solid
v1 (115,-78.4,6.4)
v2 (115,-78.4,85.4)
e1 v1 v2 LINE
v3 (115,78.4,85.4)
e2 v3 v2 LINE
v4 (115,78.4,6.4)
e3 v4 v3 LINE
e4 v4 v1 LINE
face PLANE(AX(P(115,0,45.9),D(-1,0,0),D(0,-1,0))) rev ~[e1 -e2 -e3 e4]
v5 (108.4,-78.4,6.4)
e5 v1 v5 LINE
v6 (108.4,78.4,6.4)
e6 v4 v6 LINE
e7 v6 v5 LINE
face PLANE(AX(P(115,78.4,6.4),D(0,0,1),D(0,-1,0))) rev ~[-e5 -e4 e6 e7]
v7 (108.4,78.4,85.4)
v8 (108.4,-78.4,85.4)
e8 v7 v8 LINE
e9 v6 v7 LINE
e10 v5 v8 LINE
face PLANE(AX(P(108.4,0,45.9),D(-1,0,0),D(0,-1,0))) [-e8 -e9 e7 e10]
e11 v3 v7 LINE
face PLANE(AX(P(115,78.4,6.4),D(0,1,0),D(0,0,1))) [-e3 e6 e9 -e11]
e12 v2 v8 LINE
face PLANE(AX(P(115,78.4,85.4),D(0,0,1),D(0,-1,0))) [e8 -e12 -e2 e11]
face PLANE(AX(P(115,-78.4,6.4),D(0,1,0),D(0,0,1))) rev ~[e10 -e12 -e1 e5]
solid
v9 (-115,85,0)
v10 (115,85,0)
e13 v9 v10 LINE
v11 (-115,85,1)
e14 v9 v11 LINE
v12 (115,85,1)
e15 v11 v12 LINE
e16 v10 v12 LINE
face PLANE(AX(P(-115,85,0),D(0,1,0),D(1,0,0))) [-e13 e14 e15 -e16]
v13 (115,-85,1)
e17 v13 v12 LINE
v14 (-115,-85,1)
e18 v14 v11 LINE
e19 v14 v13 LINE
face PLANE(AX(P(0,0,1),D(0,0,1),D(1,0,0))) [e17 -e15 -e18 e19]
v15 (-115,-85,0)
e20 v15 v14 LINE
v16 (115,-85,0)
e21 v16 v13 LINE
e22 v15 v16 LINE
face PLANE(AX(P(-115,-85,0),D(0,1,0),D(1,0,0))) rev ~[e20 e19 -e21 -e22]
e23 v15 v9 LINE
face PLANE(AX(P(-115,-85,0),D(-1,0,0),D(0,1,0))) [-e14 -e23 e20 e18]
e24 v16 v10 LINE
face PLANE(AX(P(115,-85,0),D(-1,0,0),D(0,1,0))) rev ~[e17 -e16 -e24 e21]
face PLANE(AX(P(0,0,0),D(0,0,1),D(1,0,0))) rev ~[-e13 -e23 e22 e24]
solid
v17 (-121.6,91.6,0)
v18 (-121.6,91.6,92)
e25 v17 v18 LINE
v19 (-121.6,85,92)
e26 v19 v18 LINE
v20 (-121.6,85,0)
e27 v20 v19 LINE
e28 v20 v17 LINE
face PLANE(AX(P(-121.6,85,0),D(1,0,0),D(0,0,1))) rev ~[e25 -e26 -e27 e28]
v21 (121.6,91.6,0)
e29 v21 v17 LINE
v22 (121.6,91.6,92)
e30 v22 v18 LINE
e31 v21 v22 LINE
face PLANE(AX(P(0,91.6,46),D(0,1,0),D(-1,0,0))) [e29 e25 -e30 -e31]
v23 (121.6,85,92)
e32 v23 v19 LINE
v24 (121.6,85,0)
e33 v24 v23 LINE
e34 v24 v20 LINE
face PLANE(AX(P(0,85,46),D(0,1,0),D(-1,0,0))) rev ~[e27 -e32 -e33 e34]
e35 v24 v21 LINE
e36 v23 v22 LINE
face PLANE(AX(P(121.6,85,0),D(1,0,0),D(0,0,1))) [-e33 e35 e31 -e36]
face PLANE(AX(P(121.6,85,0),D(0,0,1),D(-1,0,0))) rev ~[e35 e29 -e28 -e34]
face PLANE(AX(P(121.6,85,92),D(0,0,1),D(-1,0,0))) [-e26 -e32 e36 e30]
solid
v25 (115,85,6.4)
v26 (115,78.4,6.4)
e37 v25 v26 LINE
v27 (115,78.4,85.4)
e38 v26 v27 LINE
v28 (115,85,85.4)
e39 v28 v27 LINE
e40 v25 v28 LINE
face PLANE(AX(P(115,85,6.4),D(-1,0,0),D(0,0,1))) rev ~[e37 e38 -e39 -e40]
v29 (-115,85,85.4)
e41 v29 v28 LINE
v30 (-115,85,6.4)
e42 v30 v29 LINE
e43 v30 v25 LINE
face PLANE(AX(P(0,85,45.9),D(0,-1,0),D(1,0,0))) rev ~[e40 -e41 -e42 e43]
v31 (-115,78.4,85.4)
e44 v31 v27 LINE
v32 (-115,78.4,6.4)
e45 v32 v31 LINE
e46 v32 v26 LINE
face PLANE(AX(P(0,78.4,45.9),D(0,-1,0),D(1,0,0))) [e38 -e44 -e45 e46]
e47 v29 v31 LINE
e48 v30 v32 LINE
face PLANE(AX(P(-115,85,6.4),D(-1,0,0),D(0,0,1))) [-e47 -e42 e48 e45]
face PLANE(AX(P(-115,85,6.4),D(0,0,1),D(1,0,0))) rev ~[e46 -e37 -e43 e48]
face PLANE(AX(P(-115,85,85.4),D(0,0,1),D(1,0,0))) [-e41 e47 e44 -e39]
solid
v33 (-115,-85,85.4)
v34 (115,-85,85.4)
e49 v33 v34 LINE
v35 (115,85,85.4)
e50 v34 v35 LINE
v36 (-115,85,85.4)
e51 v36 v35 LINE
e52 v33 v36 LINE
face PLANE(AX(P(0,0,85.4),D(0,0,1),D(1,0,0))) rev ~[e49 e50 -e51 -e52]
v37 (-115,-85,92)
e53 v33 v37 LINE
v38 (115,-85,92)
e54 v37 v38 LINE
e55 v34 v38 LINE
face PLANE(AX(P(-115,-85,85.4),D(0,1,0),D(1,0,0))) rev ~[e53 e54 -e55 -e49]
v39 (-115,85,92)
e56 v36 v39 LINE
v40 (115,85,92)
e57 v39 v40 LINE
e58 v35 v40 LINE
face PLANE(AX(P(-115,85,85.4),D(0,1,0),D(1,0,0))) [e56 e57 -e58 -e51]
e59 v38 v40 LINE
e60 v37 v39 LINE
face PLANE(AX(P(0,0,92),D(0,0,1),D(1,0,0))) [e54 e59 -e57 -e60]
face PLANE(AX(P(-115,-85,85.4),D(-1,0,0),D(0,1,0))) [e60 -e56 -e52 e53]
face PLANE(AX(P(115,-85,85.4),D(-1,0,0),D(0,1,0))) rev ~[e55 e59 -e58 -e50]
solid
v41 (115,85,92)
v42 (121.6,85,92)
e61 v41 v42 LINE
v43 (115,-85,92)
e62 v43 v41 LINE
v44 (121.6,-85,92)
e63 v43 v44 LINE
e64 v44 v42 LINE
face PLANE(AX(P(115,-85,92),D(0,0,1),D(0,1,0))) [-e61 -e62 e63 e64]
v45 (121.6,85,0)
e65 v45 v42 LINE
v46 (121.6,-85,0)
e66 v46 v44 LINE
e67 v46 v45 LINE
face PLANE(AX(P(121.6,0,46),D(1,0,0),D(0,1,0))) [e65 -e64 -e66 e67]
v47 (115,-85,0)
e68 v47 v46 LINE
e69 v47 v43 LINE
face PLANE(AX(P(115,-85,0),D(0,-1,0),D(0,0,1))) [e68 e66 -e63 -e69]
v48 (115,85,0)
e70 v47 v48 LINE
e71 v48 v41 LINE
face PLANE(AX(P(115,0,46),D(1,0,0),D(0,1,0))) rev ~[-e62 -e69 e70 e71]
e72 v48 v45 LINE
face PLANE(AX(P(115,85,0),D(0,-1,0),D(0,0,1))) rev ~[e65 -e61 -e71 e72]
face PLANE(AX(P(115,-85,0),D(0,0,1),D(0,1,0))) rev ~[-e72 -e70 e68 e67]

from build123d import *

# Parameters (mm, degrees)
F0_W      = 230
F0_H      = 170
F1_DEPTH  = 1
F2_W      = 170
F2_H      = 92
F3_DEPTH  = 6.6
F4_W      = 243.2
F4_H      = 92
F5_DEPTH  = 6.6
F6_W      = 230
F6_H      = 79
F7_DEPTH  = 6.6
F8_W      = 156.8
F8_H      = 79
F9_DEPTH  = 6.6
F10_W     = 230
F10_H     = 170
F11_DEPTH = 6.6


# Not quite as in the source:
# - a feature names something its author has since deleted; it is built from what else it names


with BuildPart() as f1:
    # F0 (on Top) → F1 (new body)
    with BuildSketch(Plane.XY):
        Rectangle(F0_W, F0_H)
    extrude(amount=F1_DEPTH)


with BuildPart() as f3:
    # F2 (on face) → F3 (new body)
    with BuildSketch(Plane.YZ.offset(115)):
        with Locations((0, 46)):
            Rectangle(F2_W, F2_H)
    extrude(amount=F3_DEPTH)


with BuildPart() as f5:
    # F4 (on face) → F5 (new body)
    with BuildSketch(Plane(origin=(0, 85, 0), x_dir=(-1, 0, 0), z_dir=(0, 1, 0))):
        with Locations((0, 46)):
            Rectangle(F4_W, F4_H)
    extrude(amount=F5_DEPTH)


with BuildPart() as f7:
    # F6 (on face) → F7 (new body)
    with BuildSketch(Plane.XZ.offset(-85)):
        with Locations((0, 45.9)):
            Rectangle(F6_W, F6_H)
    extrude(amount=F7_DEPTH)


with BuildPart() as f9:
    # F8 (on face) → F9 (new body)
    with BuildSketch(Plane(origin=(115, 0, 0), x_dir=(0, -1, 0), z_dir=(-1, 0, 0))):
        with Locations((0, 45.9)):
            Rectangle(F8_W, F8_H)
    extrude(amount=F9_DEPTH)


with BuildPart() as f11:
    # F10 (on face) → F11 (new body)
    with BuildSketch(Plane.XY.offset(85.4)):
        Rectangle(F10_W, F10_H)
    extrude(amount=F11_DEPTH)


solid = Compound([f1.part, f3.part, f5.part, f7.part, f9.part, f11.part])
